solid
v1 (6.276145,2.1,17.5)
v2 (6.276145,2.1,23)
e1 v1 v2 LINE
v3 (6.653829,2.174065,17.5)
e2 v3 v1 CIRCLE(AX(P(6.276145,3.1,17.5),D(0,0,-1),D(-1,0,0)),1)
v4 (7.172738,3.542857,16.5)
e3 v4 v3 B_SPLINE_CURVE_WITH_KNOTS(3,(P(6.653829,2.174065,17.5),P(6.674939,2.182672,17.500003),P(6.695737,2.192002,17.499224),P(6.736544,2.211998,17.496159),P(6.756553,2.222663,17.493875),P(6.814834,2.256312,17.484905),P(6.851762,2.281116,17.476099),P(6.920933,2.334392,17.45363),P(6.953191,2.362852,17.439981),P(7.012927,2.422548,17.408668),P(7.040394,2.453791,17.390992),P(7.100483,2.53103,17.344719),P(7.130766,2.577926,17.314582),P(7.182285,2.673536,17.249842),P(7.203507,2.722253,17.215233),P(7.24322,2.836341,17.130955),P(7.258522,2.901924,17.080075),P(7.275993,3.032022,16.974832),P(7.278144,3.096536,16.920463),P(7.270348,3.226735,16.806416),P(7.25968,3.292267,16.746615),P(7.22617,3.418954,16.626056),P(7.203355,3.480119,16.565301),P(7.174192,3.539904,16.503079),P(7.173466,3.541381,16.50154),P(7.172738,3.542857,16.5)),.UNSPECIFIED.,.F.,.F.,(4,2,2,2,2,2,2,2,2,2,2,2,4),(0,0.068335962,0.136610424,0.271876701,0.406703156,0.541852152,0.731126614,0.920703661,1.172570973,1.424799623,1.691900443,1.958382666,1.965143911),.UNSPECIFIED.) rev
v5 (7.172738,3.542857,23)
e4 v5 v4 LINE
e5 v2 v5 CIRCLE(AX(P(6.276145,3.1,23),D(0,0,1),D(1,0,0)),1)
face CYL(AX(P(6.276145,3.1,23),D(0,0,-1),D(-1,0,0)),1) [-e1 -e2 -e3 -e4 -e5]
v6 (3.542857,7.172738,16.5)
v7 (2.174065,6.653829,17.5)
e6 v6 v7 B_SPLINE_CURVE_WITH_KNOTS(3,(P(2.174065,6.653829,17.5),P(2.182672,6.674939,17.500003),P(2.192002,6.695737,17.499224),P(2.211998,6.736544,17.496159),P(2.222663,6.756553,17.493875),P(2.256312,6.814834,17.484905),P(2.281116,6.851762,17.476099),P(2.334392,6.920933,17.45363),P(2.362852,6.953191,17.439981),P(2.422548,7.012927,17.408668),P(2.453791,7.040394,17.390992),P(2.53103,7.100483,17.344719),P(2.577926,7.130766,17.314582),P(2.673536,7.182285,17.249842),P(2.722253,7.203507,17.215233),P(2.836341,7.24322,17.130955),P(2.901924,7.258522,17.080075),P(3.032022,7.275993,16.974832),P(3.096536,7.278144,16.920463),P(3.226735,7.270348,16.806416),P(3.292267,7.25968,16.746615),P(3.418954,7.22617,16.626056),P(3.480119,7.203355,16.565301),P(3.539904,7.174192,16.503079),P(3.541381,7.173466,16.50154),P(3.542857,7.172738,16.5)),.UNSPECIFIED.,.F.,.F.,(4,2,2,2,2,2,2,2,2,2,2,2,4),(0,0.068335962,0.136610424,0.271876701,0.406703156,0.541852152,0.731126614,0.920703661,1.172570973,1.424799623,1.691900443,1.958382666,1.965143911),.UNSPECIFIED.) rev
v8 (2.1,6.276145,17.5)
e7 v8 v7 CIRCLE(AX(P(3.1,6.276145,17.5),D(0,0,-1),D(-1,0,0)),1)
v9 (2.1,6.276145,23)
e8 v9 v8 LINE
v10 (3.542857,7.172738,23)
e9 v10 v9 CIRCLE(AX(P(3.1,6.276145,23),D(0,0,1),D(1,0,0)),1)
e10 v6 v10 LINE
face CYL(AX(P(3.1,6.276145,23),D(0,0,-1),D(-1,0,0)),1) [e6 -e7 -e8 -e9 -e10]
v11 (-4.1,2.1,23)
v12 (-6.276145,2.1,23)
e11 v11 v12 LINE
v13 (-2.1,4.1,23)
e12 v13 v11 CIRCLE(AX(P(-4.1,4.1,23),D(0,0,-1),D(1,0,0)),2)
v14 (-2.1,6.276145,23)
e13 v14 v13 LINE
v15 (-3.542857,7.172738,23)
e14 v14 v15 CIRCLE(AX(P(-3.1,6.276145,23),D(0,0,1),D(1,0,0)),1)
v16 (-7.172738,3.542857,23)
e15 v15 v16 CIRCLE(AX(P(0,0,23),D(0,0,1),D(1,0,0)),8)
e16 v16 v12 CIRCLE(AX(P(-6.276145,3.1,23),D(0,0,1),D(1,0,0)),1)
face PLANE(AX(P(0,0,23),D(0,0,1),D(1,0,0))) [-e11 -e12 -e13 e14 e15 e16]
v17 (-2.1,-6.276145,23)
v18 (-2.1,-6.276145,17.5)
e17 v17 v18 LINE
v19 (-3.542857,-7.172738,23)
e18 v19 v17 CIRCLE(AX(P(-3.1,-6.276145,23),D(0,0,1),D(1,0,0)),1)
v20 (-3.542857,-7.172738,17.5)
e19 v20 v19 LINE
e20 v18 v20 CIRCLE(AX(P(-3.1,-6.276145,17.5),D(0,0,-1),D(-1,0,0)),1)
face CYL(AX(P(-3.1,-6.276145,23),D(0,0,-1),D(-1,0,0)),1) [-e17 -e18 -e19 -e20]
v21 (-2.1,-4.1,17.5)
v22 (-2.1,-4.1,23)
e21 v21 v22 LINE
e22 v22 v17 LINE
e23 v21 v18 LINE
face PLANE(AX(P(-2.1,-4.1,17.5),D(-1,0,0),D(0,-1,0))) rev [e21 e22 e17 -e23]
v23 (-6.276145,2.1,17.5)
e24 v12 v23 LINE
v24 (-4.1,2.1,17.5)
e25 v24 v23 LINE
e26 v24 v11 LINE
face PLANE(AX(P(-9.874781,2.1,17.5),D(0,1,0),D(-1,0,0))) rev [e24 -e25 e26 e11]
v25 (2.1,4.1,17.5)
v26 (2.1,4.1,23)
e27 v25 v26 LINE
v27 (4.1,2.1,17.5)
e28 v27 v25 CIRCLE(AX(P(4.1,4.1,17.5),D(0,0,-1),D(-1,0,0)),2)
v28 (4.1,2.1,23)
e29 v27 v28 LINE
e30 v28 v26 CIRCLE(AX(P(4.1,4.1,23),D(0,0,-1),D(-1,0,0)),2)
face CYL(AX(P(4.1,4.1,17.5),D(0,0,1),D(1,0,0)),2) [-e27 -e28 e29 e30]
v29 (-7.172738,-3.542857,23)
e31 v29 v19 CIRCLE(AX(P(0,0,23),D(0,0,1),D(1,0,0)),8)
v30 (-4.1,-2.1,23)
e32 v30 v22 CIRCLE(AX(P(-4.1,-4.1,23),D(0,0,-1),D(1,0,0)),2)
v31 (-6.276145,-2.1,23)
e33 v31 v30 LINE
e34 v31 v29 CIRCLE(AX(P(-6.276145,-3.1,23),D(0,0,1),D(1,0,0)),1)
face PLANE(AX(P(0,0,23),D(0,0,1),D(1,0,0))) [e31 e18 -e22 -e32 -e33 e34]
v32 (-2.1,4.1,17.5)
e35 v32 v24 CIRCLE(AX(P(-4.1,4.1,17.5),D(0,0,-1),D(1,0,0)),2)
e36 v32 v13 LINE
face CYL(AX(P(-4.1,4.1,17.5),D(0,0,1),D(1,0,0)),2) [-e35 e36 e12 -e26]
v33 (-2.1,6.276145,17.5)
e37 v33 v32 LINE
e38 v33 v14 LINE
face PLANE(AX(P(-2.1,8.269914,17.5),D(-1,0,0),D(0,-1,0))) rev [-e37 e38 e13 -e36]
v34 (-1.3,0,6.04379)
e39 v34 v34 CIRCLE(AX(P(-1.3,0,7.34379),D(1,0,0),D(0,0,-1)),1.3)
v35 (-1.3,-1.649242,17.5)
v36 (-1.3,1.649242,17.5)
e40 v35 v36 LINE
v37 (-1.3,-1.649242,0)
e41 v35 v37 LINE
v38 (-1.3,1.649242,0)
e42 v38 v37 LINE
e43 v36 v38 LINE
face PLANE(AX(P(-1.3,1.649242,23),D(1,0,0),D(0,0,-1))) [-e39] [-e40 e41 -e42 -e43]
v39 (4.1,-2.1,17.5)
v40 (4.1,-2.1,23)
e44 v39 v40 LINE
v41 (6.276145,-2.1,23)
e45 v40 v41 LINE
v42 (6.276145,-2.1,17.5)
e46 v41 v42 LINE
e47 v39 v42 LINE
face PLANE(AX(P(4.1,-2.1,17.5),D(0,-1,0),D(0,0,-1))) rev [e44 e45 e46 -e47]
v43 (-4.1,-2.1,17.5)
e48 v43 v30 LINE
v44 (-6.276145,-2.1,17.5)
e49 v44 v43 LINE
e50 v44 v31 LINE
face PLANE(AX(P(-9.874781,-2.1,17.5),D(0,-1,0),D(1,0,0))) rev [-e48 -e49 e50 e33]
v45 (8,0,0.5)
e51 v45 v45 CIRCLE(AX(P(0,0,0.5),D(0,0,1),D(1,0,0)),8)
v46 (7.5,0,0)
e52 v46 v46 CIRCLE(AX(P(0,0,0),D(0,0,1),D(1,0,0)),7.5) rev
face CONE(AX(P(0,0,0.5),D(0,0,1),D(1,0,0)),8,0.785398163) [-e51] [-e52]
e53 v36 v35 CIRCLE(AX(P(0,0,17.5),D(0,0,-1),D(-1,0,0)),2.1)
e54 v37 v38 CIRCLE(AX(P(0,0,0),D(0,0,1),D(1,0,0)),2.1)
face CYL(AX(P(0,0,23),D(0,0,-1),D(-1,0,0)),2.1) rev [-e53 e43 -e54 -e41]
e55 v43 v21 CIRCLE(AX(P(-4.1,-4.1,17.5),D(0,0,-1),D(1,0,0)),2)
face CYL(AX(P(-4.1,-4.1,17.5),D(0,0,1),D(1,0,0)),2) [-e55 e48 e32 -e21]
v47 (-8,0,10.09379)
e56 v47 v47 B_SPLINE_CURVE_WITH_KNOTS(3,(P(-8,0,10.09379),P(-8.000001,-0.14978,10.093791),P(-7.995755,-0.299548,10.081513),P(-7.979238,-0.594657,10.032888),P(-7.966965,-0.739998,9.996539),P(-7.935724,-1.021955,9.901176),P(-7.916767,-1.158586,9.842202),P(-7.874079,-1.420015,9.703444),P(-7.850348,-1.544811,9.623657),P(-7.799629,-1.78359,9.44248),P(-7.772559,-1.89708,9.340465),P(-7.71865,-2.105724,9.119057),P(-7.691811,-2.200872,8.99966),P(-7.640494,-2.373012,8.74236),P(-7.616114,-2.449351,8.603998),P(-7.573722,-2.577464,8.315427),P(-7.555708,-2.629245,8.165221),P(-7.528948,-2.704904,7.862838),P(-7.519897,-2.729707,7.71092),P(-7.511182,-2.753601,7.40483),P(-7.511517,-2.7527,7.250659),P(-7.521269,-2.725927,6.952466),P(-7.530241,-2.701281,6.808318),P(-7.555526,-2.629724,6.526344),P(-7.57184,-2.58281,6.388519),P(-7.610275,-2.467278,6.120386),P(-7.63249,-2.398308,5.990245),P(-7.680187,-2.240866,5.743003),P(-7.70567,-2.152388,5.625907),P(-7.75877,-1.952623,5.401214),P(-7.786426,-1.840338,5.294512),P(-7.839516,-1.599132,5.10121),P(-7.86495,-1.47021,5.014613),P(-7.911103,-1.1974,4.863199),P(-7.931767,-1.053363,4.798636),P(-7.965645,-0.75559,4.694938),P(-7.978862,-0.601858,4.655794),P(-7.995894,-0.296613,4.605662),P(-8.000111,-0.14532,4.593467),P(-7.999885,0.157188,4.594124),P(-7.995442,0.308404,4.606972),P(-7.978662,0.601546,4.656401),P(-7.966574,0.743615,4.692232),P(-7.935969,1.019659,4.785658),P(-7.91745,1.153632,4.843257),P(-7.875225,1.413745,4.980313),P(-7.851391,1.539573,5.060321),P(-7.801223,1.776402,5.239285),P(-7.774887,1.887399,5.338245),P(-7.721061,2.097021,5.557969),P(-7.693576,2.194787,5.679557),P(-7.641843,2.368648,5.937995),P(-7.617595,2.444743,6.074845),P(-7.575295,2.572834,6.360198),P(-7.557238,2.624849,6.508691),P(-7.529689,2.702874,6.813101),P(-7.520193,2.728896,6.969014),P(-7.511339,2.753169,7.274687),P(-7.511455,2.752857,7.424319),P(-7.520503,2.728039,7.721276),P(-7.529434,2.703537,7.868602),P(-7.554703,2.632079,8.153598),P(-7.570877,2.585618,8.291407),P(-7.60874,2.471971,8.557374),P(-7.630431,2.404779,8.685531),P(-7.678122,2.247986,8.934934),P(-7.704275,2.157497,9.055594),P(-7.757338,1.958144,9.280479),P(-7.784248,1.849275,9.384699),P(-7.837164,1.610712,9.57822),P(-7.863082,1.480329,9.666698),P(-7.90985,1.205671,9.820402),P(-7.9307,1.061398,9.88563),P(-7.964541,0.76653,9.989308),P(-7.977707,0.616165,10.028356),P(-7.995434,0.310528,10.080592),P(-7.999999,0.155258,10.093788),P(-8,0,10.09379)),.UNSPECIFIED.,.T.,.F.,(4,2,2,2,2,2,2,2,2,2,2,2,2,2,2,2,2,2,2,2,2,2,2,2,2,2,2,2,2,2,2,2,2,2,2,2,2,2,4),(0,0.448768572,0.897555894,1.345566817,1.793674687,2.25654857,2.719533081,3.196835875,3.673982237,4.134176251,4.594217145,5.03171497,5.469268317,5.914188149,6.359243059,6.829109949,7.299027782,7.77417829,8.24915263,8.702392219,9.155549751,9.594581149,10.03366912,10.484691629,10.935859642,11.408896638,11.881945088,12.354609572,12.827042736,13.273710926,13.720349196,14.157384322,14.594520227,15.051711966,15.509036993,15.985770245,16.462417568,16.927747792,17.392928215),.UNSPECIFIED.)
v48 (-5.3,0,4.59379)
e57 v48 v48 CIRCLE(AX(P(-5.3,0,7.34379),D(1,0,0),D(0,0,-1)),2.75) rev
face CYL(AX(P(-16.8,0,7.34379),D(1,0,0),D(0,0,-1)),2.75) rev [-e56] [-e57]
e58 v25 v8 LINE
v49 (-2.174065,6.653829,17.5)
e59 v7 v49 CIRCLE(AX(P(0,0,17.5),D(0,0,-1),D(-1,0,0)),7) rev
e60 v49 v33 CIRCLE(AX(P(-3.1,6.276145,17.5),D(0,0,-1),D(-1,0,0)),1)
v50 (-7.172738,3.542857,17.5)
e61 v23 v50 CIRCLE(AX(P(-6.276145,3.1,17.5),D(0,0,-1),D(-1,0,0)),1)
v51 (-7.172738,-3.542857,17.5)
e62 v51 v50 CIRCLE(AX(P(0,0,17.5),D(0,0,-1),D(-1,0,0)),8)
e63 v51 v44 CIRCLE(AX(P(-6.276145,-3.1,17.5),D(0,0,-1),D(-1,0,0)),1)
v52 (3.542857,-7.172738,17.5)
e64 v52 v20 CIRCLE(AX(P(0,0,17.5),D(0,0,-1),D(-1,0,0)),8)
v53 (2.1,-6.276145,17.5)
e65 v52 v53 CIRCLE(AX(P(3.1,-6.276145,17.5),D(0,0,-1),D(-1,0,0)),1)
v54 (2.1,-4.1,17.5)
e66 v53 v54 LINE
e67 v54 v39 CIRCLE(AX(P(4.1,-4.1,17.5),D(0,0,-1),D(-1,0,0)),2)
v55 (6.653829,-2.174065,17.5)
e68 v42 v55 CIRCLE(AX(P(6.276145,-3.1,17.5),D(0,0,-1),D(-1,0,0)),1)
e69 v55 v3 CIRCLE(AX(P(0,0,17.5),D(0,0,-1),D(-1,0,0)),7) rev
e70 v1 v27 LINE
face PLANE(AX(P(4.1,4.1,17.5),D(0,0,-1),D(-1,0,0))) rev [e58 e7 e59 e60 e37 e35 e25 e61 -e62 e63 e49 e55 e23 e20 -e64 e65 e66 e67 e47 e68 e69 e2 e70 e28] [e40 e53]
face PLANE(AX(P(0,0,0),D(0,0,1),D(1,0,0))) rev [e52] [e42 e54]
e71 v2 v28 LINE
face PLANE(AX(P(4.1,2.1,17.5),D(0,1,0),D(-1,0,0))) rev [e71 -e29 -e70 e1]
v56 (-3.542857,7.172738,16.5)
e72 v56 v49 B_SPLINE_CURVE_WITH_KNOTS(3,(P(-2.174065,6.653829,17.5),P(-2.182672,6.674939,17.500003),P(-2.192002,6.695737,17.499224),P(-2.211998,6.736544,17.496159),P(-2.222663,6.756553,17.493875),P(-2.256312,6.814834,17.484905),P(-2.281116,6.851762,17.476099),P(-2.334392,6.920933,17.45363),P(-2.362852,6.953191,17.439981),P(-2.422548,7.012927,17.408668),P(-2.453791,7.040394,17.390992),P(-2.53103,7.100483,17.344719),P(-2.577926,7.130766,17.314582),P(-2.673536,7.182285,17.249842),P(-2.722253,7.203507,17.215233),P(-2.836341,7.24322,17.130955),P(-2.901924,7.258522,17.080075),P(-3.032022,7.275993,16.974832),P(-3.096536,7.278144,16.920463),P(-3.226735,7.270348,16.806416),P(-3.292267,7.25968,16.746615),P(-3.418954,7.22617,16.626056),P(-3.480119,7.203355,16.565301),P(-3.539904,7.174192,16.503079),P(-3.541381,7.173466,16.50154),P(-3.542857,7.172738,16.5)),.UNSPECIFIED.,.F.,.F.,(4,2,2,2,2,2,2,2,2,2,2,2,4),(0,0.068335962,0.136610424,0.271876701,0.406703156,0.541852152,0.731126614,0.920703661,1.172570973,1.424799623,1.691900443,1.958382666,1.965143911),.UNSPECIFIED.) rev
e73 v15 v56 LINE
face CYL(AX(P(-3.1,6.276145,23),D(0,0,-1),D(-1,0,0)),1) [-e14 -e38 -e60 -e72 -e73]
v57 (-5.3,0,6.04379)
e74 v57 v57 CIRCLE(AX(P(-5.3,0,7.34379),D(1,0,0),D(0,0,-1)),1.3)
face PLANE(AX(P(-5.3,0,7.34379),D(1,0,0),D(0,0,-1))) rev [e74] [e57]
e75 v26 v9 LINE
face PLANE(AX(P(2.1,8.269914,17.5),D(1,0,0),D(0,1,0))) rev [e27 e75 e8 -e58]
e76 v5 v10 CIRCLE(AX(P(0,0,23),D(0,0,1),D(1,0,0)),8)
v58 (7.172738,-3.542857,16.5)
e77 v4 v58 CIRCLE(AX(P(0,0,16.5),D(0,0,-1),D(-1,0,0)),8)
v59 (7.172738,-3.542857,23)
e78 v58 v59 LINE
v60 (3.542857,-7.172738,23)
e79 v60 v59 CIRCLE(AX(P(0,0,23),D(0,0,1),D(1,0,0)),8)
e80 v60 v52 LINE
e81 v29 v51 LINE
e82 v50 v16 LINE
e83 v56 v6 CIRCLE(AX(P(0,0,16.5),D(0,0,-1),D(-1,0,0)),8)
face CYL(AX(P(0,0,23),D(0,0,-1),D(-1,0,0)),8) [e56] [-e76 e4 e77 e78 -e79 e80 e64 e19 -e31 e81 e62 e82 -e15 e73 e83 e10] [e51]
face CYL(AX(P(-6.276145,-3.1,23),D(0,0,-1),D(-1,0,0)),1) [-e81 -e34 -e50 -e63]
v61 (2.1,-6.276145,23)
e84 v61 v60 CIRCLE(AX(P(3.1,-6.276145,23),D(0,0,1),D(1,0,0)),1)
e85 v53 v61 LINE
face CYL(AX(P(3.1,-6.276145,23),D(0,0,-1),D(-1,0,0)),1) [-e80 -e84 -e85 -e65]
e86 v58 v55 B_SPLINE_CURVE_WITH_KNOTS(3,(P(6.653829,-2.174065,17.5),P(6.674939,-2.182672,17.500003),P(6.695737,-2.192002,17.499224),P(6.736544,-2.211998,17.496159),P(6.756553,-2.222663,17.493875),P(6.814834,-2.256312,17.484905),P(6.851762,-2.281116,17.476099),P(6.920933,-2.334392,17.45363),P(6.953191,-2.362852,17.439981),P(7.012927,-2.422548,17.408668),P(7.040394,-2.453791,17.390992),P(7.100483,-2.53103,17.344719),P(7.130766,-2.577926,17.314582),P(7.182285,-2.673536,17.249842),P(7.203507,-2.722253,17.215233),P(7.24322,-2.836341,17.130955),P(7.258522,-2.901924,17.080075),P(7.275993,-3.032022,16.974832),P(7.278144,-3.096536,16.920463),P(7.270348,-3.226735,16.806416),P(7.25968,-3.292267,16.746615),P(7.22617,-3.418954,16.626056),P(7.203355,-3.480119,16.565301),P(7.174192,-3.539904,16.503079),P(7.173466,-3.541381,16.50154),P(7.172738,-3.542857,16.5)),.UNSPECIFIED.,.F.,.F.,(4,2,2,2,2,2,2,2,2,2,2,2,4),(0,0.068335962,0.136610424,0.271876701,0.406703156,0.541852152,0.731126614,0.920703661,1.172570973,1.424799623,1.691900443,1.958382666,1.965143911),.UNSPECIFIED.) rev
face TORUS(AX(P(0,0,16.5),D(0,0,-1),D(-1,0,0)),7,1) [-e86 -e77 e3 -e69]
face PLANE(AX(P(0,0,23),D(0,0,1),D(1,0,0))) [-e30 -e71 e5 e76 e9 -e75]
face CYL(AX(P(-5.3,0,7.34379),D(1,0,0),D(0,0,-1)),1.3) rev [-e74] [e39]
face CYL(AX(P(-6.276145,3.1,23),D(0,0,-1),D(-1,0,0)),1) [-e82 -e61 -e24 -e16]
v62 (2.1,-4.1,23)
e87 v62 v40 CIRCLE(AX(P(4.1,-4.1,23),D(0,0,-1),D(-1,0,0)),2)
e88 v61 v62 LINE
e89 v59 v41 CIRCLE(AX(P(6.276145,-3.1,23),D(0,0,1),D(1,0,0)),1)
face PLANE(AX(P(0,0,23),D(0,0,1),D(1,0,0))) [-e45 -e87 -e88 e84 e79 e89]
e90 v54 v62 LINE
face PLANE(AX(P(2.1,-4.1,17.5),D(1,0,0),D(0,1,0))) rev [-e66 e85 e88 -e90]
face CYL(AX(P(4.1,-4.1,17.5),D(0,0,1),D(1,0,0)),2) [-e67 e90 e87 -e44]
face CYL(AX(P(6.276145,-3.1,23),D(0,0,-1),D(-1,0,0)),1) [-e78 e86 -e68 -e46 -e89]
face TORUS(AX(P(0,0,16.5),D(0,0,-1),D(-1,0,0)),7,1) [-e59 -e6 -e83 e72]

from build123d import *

# Parameters (mm, degrees)
SKETCH1_R           = 8
BOSS_EXTRUDE1_DEPTH = 23
CUT_EXTRUDE1_DEPTH  = 5.5
CHAMFER1_SIZE       = 0.5
FILLET1_R           = 1
SKETCH3_R           = 2.75
CUT_EXTRUDE2_DEPTH  = 15.5
SKETCH5_R           = 3.239790556
SKETCH5_R_2         = 1.3
BOSS_EXTRUDE2_DEPTH = 4


with BuildPart() as part:
    # Sketch1 → Boss-Extrude1 (new body)
    with BuildSketch(Plane.XY):
        Circle(SKETCH1_R)
        with BuildLine():
            Line((-1.3, 1.64924225), (-1.3, -1.64924225))
            ThreePointArc((-1.3, -1.64924225), (2.1, 0), (-1.3, 1.64924225))
        make_face(mode=Mode.SUBTRACT)
    extrude(amount=BOSS_EXTRUDE1_DEPTH)

    # Sketch2 → Cut-Extrude1 (cut)
    with BuildSketch(Plane.XY.offset(23)):
        with BuildLine():
            Line((4.1, 2.1), (9.874781321, 2.1))
            Line((9.874781321, 2.1), (9.874781321, -2.1))
            Line((9.874781321, -2.1), (4.1, -2.1))
            ThreePointArc((4.1, -2.1), (2.685786438, -2.685786438), (2.1, -4.1))
            Line((2.1, -4.1), (2.1, -8.269913673))
            Line((2.1, -8.269913673), (-2.1, -8.269913673))
            Line((-2.1, -8.269913673), (-2.1, -4.1))
            ThreePointArc((-2.1, -4.1), (-2.685786438, -2.685786438), (-4.1, -2.1))
            Line((-4.1, -2.1), (-9.874781321, -2.1))
            Line((-9.874781321, -2.1), (-9.874781321, 2.1))
            Line((-9.874781321, 2.1), (-4.1, 2.1))
            ThreePointArc((-4.1, 2.1), (-2.685786438, 2.685786438), (-2.1, 4.1))
            Line((-2.1, 4.1), (-2.1, 8.269913673))
            Line((-2.1, 8.269913673), (2.1, 8.269913673))
            Line((2.1, 8.269913673), (2.1, 4.1))
            ThreePointArc((2.1, 4.1), (2.685786438, 2.685786438), (4.1, 2.1))
        make_face()
    extrude(amount=-CUT_EXTRUDE1_DEPTH, mode=Mode.SUBTRACT)

    # Chamfer1
    chamfer1_edges = [part.edges().sort_by_distance(p)[0] for p in [
        (-8, 0, 0),
    ]]
    chamfer(chamfer1_edges, length=CHAMFER1_SIZE)

    # Fillet1
    # the kernel refuses this fillet: 1 mm, written as the material it takes off along each edge
    with BuildSketch(Plane(origin=(-7.719455939, 2.1, 26.857409903), x_dir=(0.35433001139154063, 0.9351204430592194, 0), z_dir=(0, 0, -1)), Plane(origin=(-2.1, -7.719455939, 26.857409903), x_dir=(-0.9351204430592192, 0.354330011391541, 0), z_dir=(0, 0, -1)), Plane(origin=(7.719455939, -2.1, 26.857409903), x_dir=(-0.354330011391541, -0.9351204430592192, 0), z_dir=(0, 0, -1)), Plane(origin=(2.1, 7.719455939, 26.857409903), x_dir=(0.935120443059219, -0.3543300113915411, 0), z_dir=(0, 0, -1))) as fillet1_piece_1:
        with BuildLine():
            CenterArc((1.446528713, 0.99533926), FILLET1_R, 159.247612079, 116.286320683)
            Line((0.51140827, 1.349669272), (0, 0))
            ThreePointArc((0, 0), (0.771481981, -0.037285918), (1.542963961, 0))
        make_face()
    extrude(amount=9.357409903, mode=Mode.SUBTRACT)
    with BuildSketch(Plane(origin=(-7.719455939, -2.1, 26.857409903), x_dir=(0.35433001139154124, -0.9351204430592192, 0), z_dir=(0, 0, -1)), Plane(origin=(2.1, -7.719455939, 26.857409903), x_dir=(0.935120443059219, 0.3543300113915412, 0), z_dir=(0, 0, -1)), Plane(origin=(7.719455939, 2.1, 26.857409903), x_dir=(-0.3543300113915409, 0.9351204430592193, 0), z_dir=(0, 0, -1)), Plane(origin=(-2.1, 7.719455939, 26.857409903), x_dir=(-0.935120443059219, -0.3543300113915412, 0), z_dir=(0, 0, -1))) as fillet1_piece_2:
        with BuildLine():
            CenterArc((1.446528713, -0.99533926), FILLET1_R, 84.466067237, 116.286320683)
            Line((0.51140827, -1.349669272), (0, 0))
            ThreePointArc((0, 0), (0.771481981, 0.037285918), (1.542963961, 0))
        make_face()
    extrude(amount=9.357409903, mode=Mode.SUBTRACT)
    with BuildSketch(Plane(origin=(0, 0, 17.5), x_dir=(1, 0, 0), z_dir=(0, 1, 0))) as fillet1_piece_3_section:
        with BuildLine():
            CenterArc((8 - FILLET1_R, FILLET1_R), FILLET1_R, 270, 90)
            Line((8 - FILLET1_R, 0), (8, 0))
            Line((8, 0), (8, FILLET1_R))
        make_face()
    fillet1_piece_3 = revolve(axis=Axis((0, 0, 17.5), (0, 0, -1)), revolution_arc=33.123591855, mode=Mode.PRIVATE)
    fillet1_piece_3 = split(fillet1_piece_3, bisect_by=Plane(origin=(7.676771465, -2.1, 17.273698774), z_dir=(0, 1, 0)), keep=Keep.TOP, mode=Mode.PRIVATE)
    add(fillet1_piece_3, mode=Mode.SUBTRACT)
    with BuildSketch(Plane(origin=(0, 0, 17.5), x_dir=(-0.5464558660226709, 0.8374879022943631, 0), z_dir=(-0.8374879022943631, -0.5464558660226709, 0))) as fillet1_piece_4_section:
        with BuildLine():
            CenterArc((8 - FILLET1_R, FILLET1_R), FILLET1_R, 270, 90)
            Line((8 - FILLET1_R, 0), (8, 0))
            Line((8, 0), (8, FILLET1_R))
        make_face()
    fillet1_piece_4 = revolve(axis=Axis((0, 0, 17.5), (0, 0, -1)), revolution_arc=66.248417342, mode=Mode.PRIVATE)
    fillet1_piece_4 = split(fillet1_piece_4, bisect_by=Plane(origin=(2.1, 7.676771683, 17.273698772), z_dir=(-1, 0, 0)), keep=Keep.TOP, mode=Mode.PRIVATE)
    fillet1_piece_4 = split(fillet1_piece_4, bisect_by=Plane(origin=(-2.1, 7.676771683, 17.273698772), z_dir=(1, 0, 0)), keep=Keep.TOP, mode=Mode.PRIVATE)
    add(fillet1_piece_4, mode=Mode.SUBTRACT)
    with BuildSketch(Plane(origin=(0, 0, 17.5), x_dir=(0.8374937851055057, 0.5464468500317786, 0), z_dir=(-0.5464468500317786, 0.8374937851055057, 0))) as fillet1_piece_5_section:
        with BuildLine():
            CenterArc((8 - FILLET1_R, FILLET1_R), FILLET1_R, 270, 90)
            Line((8 - FILLET1_R, 0), (8, 0))
            Line((8, 0), (8, FILLET1_R))
        make_face()
    fillet1_piece_5 = revolve(axis=Axis((0, 0, 17.5), (0, 0, -1)), revolution_arc=33.123591855, mode=Mode.PRIVATE)
    fillet1_piece_5 = split(fillet1_piece_5, bisect_by=Plane(origin=(7.676771942, 2.1, 17.273698679), z_dir=(0, -1, 0)), keep=Keep.TOP, mode=Mode.PRIVATE)
    add(fillet1_piece_5, mode=Mode.SUBTRACT)
    with BuildSketch(Plane(origin=(0, 0, 17.5), x_dir=(1, 0, 0), z_dir=(0, 1, 0))) as fillet1_piece_6a_section:
        with BuildLine():
            CenterArc((8 - FILLET1_R, FILLET1_R), FILLET1_R, 270, 90)
            Line((8 - FILLET1_R, 0), (8, 0))
            Line((8, 0), (8, FILLET1_R))
        make_face()
    fillet1_piece_6a = revolve(axis=Axis((0, 0, 17.5), (0, 0, -1)), revolution_arc=33.123591855, mode=Mode.PRIVATE)
    fillet1_piece_6a = split(fillet1_piece_6a, bisect_by=Plane(origin=(7.062995789, -2.1, 17.266816247), z_dir=(0, -1, 0)), keep=Keep.TOP, mode=Mode.PRIVATE)
    with BuildSketch(Plane(origin=(7.719455939, -2.1, 26.857409903), x_dir=(-0.354330011391541, -0.9351204430592192, 0), z_dir=(0, 0, -1))) as fillet1_piece_6b_section:
        with BuildLine():
            CenterArc((1.446528713, 0.99533926), FILLET1_R, 159.247612079, 116.286320683)
            Line((0.51140827, 1.349669272), (0, 0))
            ThreePointArc((0, 0), (0.771481981, -0.037285918), (1.542963961, 0))
        make_face()
    fillet1_piece_6b = extrude(amount=13.214819805, mode=Mode.PRIVATE)
    fillet1_piece_6b = split(fillet1_piece_6b, bisect_by=Plane(origin=(7.268798231, -2.449324776, 17.5), z_dir=(0, 0, -1)), keep=Keep.TOP, mode=Mode.PRIVATE)
    fillet1_piece_6 = fillet1_piece_6a & fillet1_piece_6b
    add(fillet1_piece_6, mode=Mode.SUBTRACT)
    with BuildSketch(Plane(origin=(0, 0, 17.5), x_dir=(0.8374937851055057, 0.5464468500317786, 0), z_dir=(-0.5464468500317786, 0.8374937851055057, 0))) as fillet1_piece_7a_section:
        with BuildLine():
            CenterArc((8 - FILLET1_R, FILLET1_R), FILLET1_R, 270, 90)
            Line((8 - FILLET1_R, 0), (8, 0))
            Line((8, 0), (8, FILLET1_R))
        make_face()
    fillet1_piece_7a = revolve(axis=Axis((0, 0, 17.5), (0, 0, -1)), revolution_arc=33.123591855, mode=Mode.PRIVATE)
    fillet1_piece_7a = split(fillet1_piece_7a, bisect_by=Plane(origin=(7.062995574, 2.1, 17.266816271), z_dir=(0, 1, 0)), keep=Keep.TOP, mode=Mode.PRIVATE)
    with BuildSketch(Plane(origin=(7.719455939, 2.1, 26.857409903), x_dir=(-0.3543300113915409, 0.9351204430592193, 0), z_dir=(0, 0, -1))) as fillet1_piece_7b_section:
        with BuildLine():
            CenterArc((1.446528713, -0.99533926), FILLET1_R, 84.466067237, 116.286320683)
            Line((0.51140827, -1.349669272), (0, 0))
            ThreePointArc((0, 0), (0.771481981, 0.037285918), (1.542963961, 0))
        make_face()
    fillet1_piece_7b = extrude(amount=13.214819805, mode=Mode.PRIVATE)
    fillet1_piece_7b = split(fillet1_piece_7b, bisect_by=Plane(origin=(7.268798231, 2.449324776, 17.5), z_dir=(0, 0, -1)), keep=Keep.TOP, mode=Mode.PRIVATE)
    fillet1_piece_7 = fillet1_piece_7a & fillet1_piece_7b
    add(fillet1_piece_7, mode=Mode.SUBTRACT)
    with BuildSketch(Plane(origin=(2.1, 7.719455939, 26.857409903), x_dir=(0.935120443059219, -0.3543300113915411, 0), z_dir=(0, 0, -1))) as fillet1_piece_8a_section:
        with BuildLine():
            CenterArc((1.446528713, 0.99533926), FILLET1_R, 159.247612079, 116.286320683)
            Line((0.51140827, 1.349669272), (0, 0))
            ThreePointArc((0, 0), (0.771481981, -0.037285918), (1.542963961, 0))
        make_face()
    fillet1_piece_8a = extrude(amount=13.214819805, mode=Mode.PRIVATE)
    fillet1_piece_8a = split(fillet1_piece_8a, bisect_by=Plane(origin=(2.449324776, 7.268798231, 17.5), z_dir=(0, 0, -1)), keep=Keep.TOP, mode=Mode.PRIVATE)
    with BuildSketch(Plane(origin=(0, 0, 17.5), x_dir=(-0.5464558660226709, 0.8374879022943631, 0), z_dir=(-0.8374879022943631, -0.5464558660226709, 0))) as fillet1_piece_8b_section:
        with BuildLine():
            CenterArc((8 - FILLET1_R, FILLET1_R), FILLET1_R, 270, 90)
            Line((8 - FILLET1_R, 0), (8, 0))
            Line((8, 0), (8, FILLET1_R))
        make_face()
    fillet1_piece_8b = revolve(axis=Axis((0, 0, 17.5), (0, 0, -1)), revolution_arc=66.248417342, mode=Mode.PRIVATE)
    fillet1_piece_8b = split(fillet1_piece_8b, bisect_by=Plane(origin=(2.1, 7.062976431, 17.266816363), z_dir=(1, 0, 0)), keep=Keep.TOP, mode=Mode.PRIVATE)
    fillet1_piece_8 = fillet1_piece_8a & fillet1_piece_8b
    add(fillet1_piece_8, mode=Mode.SUBTRACT)
    with BuildSketch(Plane(origin=(0, 0, 17.5), x_dir=(-0.5464558660226709, 0.8374879022943631, 0), z_dir=(-0.8374879022943631, -0.5464558660226709, 0))) as fillet1_piece_9a_section:
        with BuildLine():
            CenterArc((8 - FILLET1_R, FILLET1_R), FILLET1_R, 270, 90)
            Line((8 - FILLET1_R, 0), (8, 0))
            Line((8, 0), (8, FILLET1_R))
        make_face()
    fillet1_piece_9a = revolve(axis=Axis((0, 0, 17.5), (0, 0, -1)), revolution_arc=66.248417342, mode=Mode.PRIVATE)
    fillet1_piece_9a = split(fillet1_piece_9a, bisect_by=Plane(origin=(-2.1, 7.062976216, 17.266816386), z_dir=(-1, 0, 0)), keep=Keep.TOP, mode=Mode.PRIVATE)
    with BuildSketch(Plane(origin=(-2.1, 7.719455939, 26.857409903), x_dir=(-0.935120443059219, -0.3543300113915412, 0), z_dir=(0, 0, -1))) as fillet1_piece_9b_section:
        with BuildLine():
            CenterArc((1.446528713, -0.99533926), FILLET1_R, 84.466067237, 116.286320683)
            Line((0.51140827, -1.349669272), (0, 0))
            ThreePointArc((0, 0), (0.771481981, 0.037285918), (1.542963961, 0))
        make_face()
    fillet1_piece_9b = extrude(amount=13.214819805, mode=Mode.PRIVATE)
    fillet1_piece_9b = split(fillet1_piece_9b, bisect_by=Plane(origin=(-2.449324776, 7.268798231, 17.5), z_dir=(0, 0, -1)), keep=Keep.TOP, mode=Mode.PRIVATE)
    fillet1_piece_9 = fillet1_piece_9a & fillet1_piece_9b
    add(fillet1_piece_9, mode=Mode.SUBTRACT)

    # Sketch3 → Cut-Extrude2 (cut)
    with BuildSketch(Plane(origin=(-1.3, 0, 0), x_dir=(0, 0, -1), z_dir=(1, 0, 0))):
        with Locations(Location((-7.343789521, 0, 0), (0, 0, 36.850165711))):
            Circle(SKETCH3_R)
    extrude(amount=-CUT_EXTRUDE2_DEPTH, mode=Mode.SUBTRACT)

    # Sketch5 → Boss-Extrude2 (add)
    with BuildSketch(Plane(origin=(-1.3, 0, 0), x_dir=(0, 0, -1), z_dir=(1, 0, 0))):
        with Locations((-7.343789521, 0)):
            Circle(SKETCH5_R)
        with Locations((-7.343789521, 0)):
            Circle(SKETCH5_R_2, mode=Mode.SUBTRACT)
    extrude(amount=-BOSS_EXTRUDE2_DEPTH)


solid = part.part
